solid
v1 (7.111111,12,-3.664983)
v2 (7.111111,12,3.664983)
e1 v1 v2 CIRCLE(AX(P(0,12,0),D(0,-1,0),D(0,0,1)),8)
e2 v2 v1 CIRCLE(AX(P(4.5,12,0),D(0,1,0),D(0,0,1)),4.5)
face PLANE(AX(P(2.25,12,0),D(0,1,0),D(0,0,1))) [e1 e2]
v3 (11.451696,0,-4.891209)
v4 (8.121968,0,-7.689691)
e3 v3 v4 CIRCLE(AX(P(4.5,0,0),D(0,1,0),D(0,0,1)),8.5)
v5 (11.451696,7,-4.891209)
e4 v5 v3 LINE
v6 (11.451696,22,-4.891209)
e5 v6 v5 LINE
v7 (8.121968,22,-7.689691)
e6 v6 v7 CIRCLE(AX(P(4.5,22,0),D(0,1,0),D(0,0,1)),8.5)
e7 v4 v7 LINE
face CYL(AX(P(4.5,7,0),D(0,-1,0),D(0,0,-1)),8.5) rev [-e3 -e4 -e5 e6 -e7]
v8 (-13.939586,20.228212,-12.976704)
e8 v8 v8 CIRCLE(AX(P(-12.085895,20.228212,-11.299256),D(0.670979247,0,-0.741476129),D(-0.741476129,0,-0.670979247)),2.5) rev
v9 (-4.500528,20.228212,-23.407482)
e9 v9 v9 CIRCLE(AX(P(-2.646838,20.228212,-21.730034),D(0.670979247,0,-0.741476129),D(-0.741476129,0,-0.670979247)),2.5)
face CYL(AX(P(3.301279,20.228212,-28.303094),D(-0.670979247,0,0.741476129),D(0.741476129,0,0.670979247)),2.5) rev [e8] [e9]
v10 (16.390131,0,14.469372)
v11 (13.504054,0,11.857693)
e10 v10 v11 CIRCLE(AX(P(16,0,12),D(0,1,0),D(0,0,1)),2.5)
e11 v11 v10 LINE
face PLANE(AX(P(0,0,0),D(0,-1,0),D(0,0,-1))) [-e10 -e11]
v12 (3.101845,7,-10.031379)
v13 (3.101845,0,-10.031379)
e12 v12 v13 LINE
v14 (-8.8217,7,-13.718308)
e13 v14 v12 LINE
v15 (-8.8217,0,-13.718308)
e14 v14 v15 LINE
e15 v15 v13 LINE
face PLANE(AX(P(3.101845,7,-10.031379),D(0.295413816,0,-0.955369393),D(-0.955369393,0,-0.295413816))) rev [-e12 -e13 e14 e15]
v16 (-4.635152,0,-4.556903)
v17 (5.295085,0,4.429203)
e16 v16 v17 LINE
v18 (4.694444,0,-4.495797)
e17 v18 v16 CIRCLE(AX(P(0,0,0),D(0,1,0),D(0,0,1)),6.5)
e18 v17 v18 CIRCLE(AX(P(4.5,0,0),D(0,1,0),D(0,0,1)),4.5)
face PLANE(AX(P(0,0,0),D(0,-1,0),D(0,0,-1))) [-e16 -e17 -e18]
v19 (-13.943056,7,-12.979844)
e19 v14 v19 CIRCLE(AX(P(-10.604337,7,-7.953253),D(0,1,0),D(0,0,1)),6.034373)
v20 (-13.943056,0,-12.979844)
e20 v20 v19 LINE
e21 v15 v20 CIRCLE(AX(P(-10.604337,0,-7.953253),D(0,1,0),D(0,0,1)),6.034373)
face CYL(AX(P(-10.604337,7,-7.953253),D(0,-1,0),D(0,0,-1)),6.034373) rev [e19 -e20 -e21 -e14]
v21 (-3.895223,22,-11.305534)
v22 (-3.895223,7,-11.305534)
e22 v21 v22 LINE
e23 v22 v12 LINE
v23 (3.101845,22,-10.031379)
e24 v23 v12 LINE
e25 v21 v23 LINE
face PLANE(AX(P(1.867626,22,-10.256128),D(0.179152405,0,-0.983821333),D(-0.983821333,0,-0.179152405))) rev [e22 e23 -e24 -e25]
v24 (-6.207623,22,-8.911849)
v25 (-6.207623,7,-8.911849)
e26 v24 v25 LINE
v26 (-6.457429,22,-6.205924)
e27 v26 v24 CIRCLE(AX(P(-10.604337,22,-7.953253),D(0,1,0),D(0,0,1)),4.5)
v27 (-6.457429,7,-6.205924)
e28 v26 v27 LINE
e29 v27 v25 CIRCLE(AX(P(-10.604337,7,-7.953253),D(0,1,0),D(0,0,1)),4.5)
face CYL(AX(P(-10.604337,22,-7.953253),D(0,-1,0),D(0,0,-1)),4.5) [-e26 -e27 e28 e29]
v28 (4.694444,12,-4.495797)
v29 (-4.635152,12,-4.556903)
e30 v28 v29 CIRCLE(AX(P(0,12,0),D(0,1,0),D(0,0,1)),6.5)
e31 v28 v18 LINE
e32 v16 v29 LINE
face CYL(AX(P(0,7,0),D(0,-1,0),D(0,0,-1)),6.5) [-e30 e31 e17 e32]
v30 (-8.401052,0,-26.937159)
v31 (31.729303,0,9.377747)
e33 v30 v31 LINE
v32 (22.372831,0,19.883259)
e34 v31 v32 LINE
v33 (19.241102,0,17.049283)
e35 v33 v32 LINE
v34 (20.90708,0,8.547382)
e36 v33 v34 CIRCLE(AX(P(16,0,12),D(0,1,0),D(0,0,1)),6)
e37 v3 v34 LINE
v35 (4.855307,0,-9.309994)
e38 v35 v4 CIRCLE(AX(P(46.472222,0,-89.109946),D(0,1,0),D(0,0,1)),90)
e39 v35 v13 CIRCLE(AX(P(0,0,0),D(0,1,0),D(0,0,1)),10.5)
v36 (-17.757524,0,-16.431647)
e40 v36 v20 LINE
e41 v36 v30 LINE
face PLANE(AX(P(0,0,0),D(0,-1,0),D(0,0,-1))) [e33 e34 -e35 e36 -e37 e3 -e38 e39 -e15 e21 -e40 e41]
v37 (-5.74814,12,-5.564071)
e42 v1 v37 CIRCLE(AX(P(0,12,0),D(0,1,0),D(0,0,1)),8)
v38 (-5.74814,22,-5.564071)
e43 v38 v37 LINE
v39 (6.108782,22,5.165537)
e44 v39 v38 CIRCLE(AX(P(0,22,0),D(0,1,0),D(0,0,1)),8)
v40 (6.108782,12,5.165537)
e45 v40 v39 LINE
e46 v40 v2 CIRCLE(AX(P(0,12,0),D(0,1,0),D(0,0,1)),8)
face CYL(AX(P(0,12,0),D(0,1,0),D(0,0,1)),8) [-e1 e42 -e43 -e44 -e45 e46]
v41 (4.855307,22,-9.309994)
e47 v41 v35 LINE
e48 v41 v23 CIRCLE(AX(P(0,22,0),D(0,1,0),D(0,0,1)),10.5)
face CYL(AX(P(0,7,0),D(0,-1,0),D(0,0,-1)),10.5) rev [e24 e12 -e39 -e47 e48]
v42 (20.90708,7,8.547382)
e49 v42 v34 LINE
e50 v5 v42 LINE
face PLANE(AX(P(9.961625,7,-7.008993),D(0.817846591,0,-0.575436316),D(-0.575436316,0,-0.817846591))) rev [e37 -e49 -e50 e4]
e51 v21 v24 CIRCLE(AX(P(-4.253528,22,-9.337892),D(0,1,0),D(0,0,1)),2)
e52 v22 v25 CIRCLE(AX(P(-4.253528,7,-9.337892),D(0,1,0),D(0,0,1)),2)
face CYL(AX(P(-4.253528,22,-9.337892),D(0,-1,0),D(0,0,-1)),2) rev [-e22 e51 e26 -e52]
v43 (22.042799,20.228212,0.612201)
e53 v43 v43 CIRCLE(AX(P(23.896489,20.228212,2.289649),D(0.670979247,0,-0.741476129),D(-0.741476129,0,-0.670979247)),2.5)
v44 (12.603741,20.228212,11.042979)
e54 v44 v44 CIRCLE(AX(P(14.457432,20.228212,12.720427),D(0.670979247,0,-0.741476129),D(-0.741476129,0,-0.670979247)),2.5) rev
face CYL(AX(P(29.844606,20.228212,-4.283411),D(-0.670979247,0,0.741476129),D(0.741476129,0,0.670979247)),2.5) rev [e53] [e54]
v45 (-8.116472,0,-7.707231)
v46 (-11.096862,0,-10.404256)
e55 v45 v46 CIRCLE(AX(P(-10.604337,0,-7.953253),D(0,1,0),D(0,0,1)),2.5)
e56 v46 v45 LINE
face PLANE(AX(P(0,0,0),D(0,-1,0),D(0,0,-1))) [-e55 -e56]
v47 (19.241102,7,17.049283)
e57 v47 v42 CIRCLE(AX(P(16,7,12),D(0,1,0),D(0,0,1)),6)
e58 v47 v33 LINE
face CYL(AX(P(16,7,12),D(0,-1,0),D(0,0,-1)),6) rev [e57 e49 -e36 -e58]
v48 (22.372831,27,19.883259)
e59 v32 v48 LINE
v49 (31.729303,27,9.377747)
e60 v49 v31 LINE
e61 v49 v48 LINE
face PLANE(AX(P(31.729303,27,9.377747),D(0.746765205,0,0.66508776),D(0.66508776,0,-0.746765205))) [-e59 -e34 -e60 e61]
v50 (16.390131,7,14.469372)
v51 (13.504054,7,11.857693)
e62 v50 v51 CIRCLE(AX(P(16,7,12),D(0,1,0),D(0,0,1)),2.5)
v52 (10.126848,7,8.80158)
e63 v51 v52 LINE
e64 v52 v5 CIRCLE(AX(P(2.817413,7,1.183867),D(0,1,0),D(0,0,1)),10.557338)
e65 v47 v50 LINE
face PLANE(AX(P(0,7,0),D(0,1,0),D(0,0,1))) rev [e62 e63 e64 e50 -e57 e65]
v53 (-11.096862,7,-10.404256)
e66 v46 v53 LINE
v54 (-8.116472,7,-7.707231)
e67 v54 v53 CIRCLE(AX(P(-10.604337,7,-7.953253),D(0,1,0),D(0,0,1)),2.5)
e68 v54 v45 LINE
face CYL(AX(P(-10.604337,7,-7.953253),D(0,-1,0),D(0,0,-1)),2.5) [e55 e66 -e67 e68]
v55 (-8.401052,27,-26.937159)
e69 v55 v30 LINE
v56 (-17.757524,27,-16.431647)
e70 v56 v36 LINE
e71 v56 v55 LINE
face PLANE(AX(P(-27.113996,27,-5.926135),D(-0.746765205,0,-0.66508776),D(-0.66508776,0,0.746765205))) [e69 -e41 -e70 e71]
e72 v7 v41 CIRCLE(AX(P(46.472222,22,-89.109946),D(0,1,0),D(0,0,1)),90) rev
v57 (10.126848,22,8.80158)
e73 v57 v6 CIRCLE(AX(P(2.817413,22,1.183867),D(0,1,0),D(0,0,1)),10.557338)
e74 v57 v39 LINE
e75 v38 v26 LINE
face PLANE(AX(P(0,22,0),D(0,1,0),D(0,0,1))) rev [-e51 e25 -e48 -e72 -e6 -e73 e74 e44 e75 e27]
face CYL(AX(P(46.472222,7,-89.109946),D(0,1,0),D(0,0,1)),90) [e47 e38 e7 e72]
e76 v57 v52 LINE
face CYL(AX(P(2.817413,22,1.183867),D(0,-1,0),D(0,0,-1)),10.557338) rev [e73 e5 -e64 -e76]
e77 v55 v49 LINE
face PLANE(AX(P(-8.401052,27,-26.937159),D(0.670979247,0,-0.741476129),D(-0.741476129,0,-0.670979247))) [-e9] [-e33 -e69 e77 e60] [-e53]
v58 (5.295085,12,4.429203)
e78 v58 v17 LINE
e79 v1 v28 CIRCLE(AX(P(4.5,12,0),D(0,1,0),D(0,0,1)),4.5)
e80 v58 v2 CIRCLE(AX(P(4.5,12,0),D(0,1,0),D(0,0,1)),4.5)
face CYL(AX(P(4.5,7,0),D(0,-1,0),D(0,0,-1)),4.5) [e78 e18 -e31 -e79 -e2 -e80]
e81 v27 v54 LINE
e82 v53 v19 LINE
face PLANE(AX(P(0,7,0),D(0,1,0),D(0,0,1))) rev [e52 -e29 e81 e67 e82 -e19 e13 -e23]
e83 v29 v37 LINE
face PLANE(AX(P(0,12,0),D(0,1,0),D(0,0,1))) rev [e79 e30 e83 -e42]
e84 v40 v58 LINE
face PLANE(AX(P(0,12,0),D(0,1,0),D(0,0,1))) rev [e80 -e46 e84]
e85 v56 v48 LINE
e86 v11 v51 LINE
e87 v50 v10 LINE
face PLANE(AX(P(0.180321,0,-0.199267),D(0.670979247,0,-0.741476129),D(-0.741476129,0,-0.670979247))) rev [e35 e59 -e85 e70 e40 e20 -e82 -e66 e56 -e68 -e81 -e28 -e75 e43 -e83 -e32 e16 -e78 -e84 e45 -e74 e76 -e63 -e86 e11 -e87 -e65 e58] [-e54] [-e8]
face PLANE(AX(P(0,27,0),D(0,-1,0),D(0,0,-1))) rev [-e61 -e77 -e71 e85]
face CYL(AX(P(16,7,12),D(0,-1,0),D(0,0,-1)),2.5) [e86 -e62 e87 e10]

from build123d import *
from build123d.topology import SkipClean

# Parameters (mm, degrees)
SKETCH2_R           = 2.5
BOSS_EXTRUDE1_DEPTH = 7
FILLET1_R           = 90
BOSS_EXTRUDE3_DEPTH = 15
SKETCH4_R           = 8
CUT_EXTRUDE1_DEPTH  = 10
BOSS_EXTRUDE4_START = 10
BOSS_EXTRUDE4_DEPTH = 10
BOSS_EXTRUDE5_DEPTH = 27
SKETCH7_R           = 2.5
CUT_EXTRUDE2_DEPTH  = 37
INTERSECT3_DEPTH    = 27


with BuildPart() as part:
    # Sketch2 → Boss-Extrude1 (new body)
    with BuildSketch(Plane(origin=(0, 0, 0), x_dir=(1, 0, 0), z_dir=(0, 1, 0))):
        with BuildLine():
            Line((-4.24846021, -9.602113613), (13.572308451, -17.486922065))
            ThreePointArc((13.572308451, -17.486922065), (20.638500285, -15.805826469), (20.907079545, -8.547382103))
            Line((20.907079545, -8.547382103), (11.451696022, 4.891208687))
            ThreePointArc((11.451696022, 4.891208687), (9.270724445, 7.034926316), (6.472222222, 8.268031175))
            ThreePointArc((6.472222222, 8.268031175), (4.86754966, 9.30359932), (3.101845071, 10.031378627))
            Line((3.101845071, 10.031378627), (-8.821699821, 13.718308443))
            ThreePointArc((-8.821699821, 13.718308443), (-15.091857172, 11.987583677), (-16.147811194, 5.569231667))
            Line((-16.147811194, 5.569231667), (-12.308520784, -3.358124948))
            ThreePointArc((-12.308520784, -3.358124948), (-9.971976629, -6.504419403), (-6.472222222, -8.268031175))
            ThreePointArc((-6.472222222, -8.268031175), (-5.401685102, -9.003987898), (-4.24846021, -9.602113613))
        make_face()
        with Locations(Location((16, -12, 0), (0, 0, 270))):
            Circle(SKETCH2_R, mode=Mode.SUBTRACT)
        with Locations(Location((-10.604337088, 7.953252816, 0), (0, 0, 270))):
            Circle(SKETCH2_R, mode=Mode.SUBTRACT)
        with BuildLine():
            ThreePointArc((-4.694444444, -4.495797077), (0, -6.5), (4.694444444, -4.495797077))
            ThreePointArc((4.694444444, -4.495797077), (9, 0), (4.694444444, 4.495797077))
            ThreePointArc((4.694444444, 4.495797077), (0, 6.5), (-4.694444444, 4.495797077))
            ThreePointArc((-4.694444444, 4.495797077), (-9, 0), (-4.694444444, -4.495797077))
        make_face(mode=Mode.SUBTRACT)
    extrude(amount=BOSS_EXTRUDE1_DEPTH)

    # Fillet1
    fillet1_edges = [part.edges().sort_by_distance(p)[0] for p in [
        (6.472222222, 3.5, -8.268031175),
        (-6.472222222, 3.5, 8.268031175),
    ]]
    fillet(fillet1_edges, radius=FILLET1_R)

    # Sketch3 → Boss-Extrude3 (add)
    with BuildSketch(Plane(origin=(0, 7, 0), x_dir=(1, 0, 0), z_dir=(0, 1, 0))):
        with BuildLine():
            Line((-13.446880098, 1.012795393), (-12.308520784, -3.358124948))
            ThreePointArc((-12.308520784, -3.358124948), (-10.611843956, -5.907229762), (-8.121968415, -7.689690813))
            ThreePointArc((-8.121968415, -7.689690813), (-6.480430757, -8.483296944), (-4.855306799, -9.309994408))
            ThreePointArc((-4.855306799, -9.309994408), (-4.554226262, -9.460920841), (-4.24846021, -9.602113613))
            Line((-4.24846021, -9.602113613), (-1.454246479, -10.838414946))
            ThreePointArc((-1.454246479, -10.838414946), (10.979115699, -7.880432641), (11.451696022, 4.891208687))
            ThreePointArc((11.451696022, 4.891208687), (9.968863726, 6.507036925), (8.121968415, 7.689690813))
            ThreePointArc((8.121968415, 7.689690813), (6.480430757, 8.483296944), (4.855306799, 9.309994408))
            ThreePointArc((4.855306799, 9.309994408), (3.994892398, 9.710346787), (3.101845071, 10.031378627))
            Line((3.101845071, 10.031378627), (-3.895223267, 11.305534387))
            ThreePointArc((-3.895223267, 11.305534387), (-5.691953988, 10.727471116), (-6.207623157, 8.911848981))
            ThreePointArc((-6.207623157, 8.911848981), (-7.30582589, 4.892236012), (-11.232333003, 3.497288147))
            ThreePointArc((-11.232333003, 3.497288147), (-13.004436636, 2.847636589), (-13.446880098, 1.012795393))
        make_face()
        with BuildLine():
            ThreePointArc((4.694444444, -4.495797077), (9, 0), (4.694444444, 4.495797077))
            ThreePointArc((4.694444444, 4.495797077), (0, 6.5), (-4.694444444, 4.495797077))
            ThreePointArc((-4.694444444, 4.495797077), (-9, 0), (-4.694444444, -4.495797077))
            ThreePointArc((-4.694444444, -4.495797077), (0, -6.5), (4.694444444, -4.495797077))
        make_face(mode=Mode.SUBTRACT)
    extrude(amount=BOSS_EXTRUDE3_DEPTH)

    # Sketch4 → Cut-Extrude1 (cut)
    with BuildSketch(Plane(origin=(0, 22, 0), x_dir=(1, 0, 0), z_dir=(0, 1, 0))):
        Circle(SKETCH4_R)
    extrude(amount=-CUT_EXTRUDE1_DEPTH, mode=Mode.SUBTRACT)

    # Sketch5 → Boss-Extrude4 (add)
    with SkipClean():  # the faces are left unmerged after this step: merging them gives an invalid solid
        with BuildSketch(Plane(origin=(0, 12, 0), x_dir=(1, 0, 0), z_dir=(0, 1, 0)).offset(BOSS_EXTRUDE4_START)):
            with BuildLine():
                ThreePointArc((-7.111111111, 3.664982778), (-8, 0), (-7.111111111, -3.664982778))
                ThreePointArc((-7.111111111, -3.664982778), (-9, 0), (-7.111111111, 3.664982778))
            make_face()
            with BuildLine():
                ThreePointArc((7.111111111, -3.664982778), (9, 0), (7.111111111, 3.664982778))
                ThreePointArc((7.111111111, 3.664982778), (8, 0), (7.111111111, -3.664982778))
            make_face()
        extrude(amount=-BOSS_EXTRUDE4_DEPTH)


with BuildPart() as body_2:
    # Sketch6 → Boss-Extrude5 (new body)
    with BuildSketch(Plane(origin=(0, 0, 0), x_dir=(-1, 0, 0), z_dir=(0, -1, 0))):
        Polygon((8.401052482, 26.937158796), (-31.729302738, -9.377746691), (-13.016359271, -30.388770935), (27.113995949, 5.926134553), align=None)
    extrude(amount=-BOSS_EXTRUDE5_DEPTH)

    # Sketch7 → Cut-Extrude2 (cut)
    with BuildSketch(Plane(origin=(-9.25873614, 0, 10.23151142), x_dir=(0.7414761288495602, 0, 0.670979247329059), z_dir=(-0.670979247329059, 0, 0.7414761288495602))):
        with Locations((-16.542969249, 20.228212297)):
            Circle(SKETCH7_R)
        with Locations((19.254983261, 20.228212297)):
            Circle(SKETCH7_R)
    extrude(amount=-CUT_EXTRUDE2_DEPTH, mode=Mode.SUBTRACT)

    # Intersect1: read off the stored shape, not the designer's step
    # Intersect1: cut part
    add(part.part, mode=Mode.SUBTRACT)

    # Intersect3: read off the stored shape, not the designer's step
    # Intersect3 outline → Intersect3 (cut)
    with BuildSketch(Plane(origin=(0, 0, 0), x_dir=(1, 0, 0), z_dir=(0, 1, 0))):
        Polygon((13.016359271, -30.388770935), (22.372831004, -19.883258813), (-17.757524216, 16.431646675), (-27.113995949, 5.926134553), align=None)
    extrude(amount=INTERSECT3_DEPTH, mode=Mode.SUBTRACT)


solid = body_2.part
